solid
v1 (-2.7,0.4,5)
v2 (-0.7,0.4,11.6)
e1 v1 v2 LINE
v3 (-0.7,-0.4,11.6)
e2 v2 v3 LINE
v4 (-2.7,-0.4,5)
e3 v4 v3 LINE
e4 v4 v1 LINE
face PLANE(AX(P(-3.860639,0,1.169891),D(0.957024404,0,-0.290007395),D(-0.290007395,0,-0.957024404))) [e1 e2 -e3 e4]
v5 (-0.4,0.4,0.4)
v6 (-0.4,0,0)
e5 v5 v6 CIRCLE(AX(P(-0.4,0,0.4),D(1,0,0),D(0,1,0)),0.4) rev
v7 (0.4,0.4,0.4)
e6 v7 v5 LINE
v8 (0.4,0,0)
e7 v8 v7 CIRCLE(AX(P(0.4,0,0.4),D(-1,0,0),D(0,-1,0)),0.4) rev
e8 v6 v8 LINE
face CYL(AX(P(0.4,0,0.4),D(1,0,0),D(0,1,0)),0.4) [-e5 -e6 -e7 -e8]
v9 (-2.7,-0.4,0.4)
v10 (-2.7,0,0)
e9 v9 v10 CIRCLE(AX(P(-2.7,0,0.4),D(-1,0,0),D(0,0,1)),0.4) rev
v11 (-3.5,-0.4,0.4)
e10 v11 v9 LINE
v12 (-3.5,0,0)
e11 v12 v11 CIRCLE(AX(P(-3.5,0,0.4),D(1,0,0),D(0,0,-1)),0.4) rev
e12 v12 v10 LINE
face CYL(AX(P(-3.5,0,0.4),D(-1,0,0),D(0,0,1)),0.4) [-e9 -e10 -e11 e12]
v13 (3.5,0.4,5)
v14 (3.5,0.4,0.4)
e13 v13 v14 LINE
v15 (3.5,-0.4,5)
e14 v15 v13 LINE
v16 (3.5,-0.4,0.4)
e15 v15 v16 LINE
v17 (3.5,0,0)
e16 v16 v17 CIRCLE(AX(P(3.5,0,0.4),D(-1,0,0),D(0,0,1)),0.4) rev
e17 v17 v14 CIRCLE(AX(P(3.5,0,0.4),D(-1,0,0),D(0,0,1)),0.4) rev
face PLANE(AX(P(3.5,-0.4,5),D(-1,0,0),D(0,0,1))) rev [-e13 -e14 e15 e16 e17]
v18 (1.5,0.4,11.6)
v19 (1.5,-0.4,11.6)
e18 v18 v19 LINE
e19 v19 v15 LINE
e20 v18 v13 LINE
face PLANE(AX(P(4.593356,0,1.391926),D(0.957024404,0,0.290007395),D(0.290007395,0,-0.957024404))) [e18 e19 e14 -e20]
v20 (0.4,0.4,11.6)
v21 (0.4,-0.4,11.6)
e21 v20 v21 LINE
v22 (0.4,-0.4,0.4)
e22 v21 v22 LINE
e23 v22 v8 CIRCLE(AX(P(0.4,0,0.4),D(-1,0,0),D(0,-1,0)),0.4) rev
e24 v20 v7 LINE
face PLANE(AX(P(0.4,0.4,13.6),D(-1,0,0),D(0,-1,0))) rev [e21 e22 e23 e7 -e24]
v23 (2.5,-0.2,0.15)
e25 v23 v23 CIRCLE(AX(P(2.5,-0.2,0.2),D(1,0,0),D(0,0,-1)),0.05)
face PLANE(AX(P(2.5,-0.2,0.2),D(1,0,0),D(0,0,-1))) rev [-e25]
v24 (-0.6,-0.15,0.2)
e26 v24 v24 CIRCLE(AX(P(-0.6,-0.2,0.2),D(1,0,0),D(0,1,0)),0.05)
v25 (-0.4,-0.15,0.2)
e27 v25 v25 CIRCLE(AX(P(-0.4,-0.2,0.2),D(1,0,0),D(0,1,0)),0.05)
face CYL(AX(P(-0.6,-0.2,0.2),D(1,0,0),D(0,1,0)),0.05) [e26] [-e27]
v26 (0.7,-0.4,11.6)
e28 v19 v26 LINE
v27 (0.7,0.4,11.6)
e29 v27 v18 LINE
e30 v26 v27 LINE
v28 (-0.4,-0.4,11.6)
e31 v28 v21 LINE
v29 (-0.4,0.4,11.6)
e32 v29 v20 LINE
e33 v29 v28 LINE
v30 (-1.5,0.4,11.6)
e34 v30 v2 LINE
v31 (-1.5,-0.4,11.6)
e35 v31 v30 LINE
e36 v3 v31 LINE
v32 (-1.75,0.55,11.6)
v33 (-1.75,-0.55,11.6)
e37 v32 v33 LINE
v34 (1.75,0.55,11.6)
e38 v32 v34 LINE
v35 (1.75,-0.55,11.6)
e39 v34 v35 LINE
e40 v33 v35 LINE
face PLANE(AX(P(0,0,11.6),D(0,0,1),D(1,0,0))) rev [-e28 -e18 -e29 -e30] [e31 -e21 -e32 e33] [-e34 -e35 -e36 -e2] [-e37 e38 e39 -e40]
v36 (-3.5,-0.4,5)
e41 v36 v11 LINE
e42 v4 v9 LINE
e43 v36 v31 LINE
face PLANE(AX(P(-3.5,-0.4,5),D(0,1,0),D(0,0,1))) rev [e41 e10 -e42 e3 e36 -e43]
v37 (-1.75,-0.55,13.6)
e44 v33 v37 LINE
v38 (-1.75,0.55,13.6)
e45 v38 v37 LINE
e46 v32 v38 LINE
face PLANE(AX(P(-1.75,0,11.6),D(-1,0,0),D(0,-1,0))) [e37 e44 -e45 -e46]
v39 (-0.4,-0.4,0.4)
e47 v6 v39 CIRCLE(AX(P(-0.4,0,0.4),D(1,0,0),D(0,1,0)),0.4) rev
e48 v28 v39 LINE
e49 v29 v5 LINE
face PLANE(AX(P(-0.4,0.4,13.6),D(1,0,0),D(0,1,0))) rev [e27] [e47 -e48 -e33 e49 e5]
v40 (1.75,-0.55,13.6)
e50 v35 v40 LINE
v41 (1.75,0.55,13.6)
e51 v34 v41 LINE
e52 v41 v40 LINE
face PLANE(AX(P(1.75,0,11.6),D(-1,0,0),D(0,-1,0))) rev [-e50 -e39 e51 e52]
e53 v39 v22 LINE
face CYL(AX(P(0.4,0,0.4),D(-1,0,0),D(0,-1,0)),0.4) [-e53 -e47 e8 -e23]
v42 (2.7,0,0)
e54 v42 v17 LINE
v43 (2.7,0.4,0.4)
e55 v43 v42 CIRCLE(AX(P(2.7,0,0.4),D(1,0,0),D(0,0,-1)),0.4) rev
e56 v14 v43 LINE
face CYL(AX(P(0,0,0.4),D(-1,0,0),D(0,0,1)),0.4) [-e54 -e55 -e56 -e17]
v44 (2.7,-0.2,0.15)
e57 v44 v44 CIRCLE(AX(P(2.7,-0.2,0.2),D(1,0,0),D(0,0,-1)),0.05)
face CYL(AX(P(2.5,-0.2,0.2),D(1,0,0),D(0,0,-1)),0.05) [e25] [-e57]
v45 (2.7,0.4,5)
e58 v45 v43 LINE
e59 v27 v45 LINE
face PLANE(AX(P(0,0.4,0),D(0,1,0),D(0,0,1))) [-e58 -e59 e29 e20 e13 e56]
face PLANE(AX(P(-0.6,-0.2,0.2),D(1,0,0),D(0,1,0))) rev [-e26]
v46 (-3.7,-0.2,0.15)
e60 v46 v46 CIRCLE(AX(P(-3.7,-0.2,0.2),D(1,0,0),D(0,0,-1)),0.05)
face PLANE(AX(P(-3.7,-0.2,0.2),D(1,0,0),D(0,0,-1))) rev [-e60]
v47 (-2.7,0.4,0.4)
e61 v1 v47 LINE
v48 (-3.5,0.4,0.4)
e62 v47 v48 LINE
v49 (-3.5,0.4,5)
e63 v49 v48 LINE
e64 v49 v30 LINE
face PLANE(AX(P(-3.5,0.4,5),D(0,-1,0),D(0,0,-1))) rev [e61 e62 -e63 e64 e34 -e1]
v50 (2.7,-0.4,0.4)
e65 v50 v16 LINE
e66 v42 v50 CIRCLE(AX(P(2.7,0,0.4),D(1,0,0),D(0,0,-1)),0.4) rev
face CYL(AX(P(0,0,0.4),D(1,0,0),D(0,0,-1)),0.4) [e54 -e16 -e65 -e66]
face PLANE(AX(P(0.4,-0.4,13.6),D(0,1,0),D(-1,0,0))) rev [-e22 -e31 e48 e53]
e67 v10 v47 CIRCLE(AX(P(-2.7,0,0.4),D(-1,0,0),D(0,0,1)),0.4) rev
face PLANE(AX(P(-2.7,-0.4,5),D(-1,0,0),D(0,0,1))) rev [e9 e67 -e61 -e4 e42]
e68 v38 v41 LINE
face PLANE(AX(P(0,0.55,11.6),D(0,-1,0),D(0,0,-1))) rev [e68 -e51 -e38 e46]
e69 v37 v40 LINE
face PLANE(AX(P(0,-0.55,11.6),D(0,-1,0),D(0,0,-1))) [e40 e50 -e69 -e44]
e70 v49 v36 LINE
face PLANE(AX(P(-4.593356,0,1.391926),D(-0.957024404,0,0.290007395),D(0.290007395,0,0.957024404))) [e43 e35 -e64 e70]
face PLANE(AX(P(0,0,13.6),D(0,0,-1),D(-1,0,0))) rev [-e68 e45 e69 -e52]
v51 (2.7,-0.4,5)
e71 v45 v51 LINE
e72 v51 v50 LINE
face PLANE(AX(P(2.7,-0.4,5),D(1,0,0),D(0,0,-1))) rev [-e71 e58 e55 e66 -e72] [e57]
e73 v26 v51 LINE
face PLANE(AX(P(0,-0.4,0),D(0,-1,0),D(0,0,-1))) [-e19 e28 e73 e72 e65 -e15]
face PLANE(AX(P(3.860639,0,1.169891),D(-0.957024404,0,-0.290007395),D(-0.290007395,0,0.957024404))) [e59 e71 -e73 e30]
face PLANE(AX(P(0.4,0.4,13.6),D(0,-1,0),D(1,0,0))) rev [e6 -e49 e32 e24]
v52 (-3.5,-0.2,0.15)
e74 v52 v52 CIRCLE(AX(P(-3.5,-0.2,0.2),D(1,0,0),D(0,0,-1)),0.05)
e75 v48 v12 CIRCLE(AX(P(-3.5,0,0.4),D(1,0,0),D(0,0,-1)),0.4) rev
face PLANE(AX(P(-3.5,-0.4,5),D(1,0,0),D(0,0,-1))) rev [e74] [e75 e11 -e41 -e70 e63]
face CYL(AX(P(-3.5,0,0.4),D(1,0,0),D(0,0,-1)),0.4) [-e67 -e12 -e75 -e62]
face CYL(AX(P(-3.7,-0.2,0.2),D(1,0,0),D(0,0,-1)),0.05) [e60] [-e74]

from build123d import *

# Parameters (mm, degrees)
SKETCH1_W             = 0.8
SKETCH1_H             = 0.8
BOSS_EXTRUDE1_DEPTH   = 13.6
SKETCH2_R             = 0.05
BOSS_EXTRUDE2_DEPTH   = 1
SKETCH3_W             = 3.5
SKETCH3_H             = 1.1
SKETCH3_W_2           = 0.8
SKETCH3_H_2           = 0.8
BOSS_EXTRUDE3_DEPTH   = 2
SKETCH6_W             = 0.8
SKETCH6_H             = 0.8
BOSS_EXTRUDE4_DEPTH   = 5
BOSS_EXTRUDE4_2_DEPTH = 5
SKETCH8_R             = 0.05
BOSS_EXTRUDE5_DEPTH   = 1
SKETCH9_R             = 0.05
BOSS_EXTRUDE6_DEPTH   = 1
LOFT1_START           = -0.4
LOFT1_DEPTH           = 0.8
LOFT2_START           = -0.4
LOFT2_DEPTH           = 0.8
FILLET1_R             = 0.4


# Read off the part's stored shape, not the designer's step: Loft1, Loft2
with BuildPart() as part:
    # Sketch1 → Boss-Extrude1 (new body)
    with BuildSketch(Plane.XY):
        Rectangle(SKETCH1_W, SKETCH1_H)
    extrude(amount=BOSS_EXTRUDE1_DEPTH)

    # Sketch2 → Boss-Extrude2 (add)
    with BuildSketch(Plane(origin=(0.4, 0, 0), x_dir=(0, 0, -1), z_dir=(1, 0, 0))):
        with Locations(Location((-0.2, -0.2, 0), (0, 0, 90))):
            Circle(SKETCH2_R)
    extrude(amount=-BOSS_EXTRUDE2_DEPTH)

    # Sketch3 → Boss-Extrude3 (add)
    # profile 1 of 3: a face of its own
    with BuildSketch(Plane.XY.offset(13.6)):
        Rectangle(SKETCH3_W, SKETCH3_H)
        Rectangle(SKETCH3_W_2, SKETCH3_H_2, mode=Mode.SUBTRACT)
    # profile 2 of 3: a face of its own
    with BuildSketch(Plane.XY.offset(13.6)):
        Rectangle(SKETCH3_W_2, SKETCH3_H_2)
    # profile 3 of 3: a face of its own
    with BuildSketch(Plane.XY.offset(13.6)):
        Rectangle(SKETCH3_W_2, SKETCH3_H_2)
    extrude(amount=-BOSS_EXTRUDE3_DEPTH)



with BuildPart() as body_2:
    # Sketch6 → Boss-Extrude4 (new body)
    with BuildSketch(Plane.XY):
        with Locations((3.1, 0)):
            Rectangle(SKETCH6_W, SKETCH6_H)
    extrude(amount=BOSS_EXTRUDE4_DEPTH)

    # Sketch8 → Boss-Extrude5 (add)
    with BuildSketch(Plane(origin=(3.5, 0, 0), x_dir=(0, 0, -1), z_dir=(1, 0, 0))):
        with Locations(Location((-0.2, -0.2, 0), (0, 0, 90))):
            Circle(SKETCH8_R)
    extrude(amount=-BOSS_EXTRUDE5_DEPTH)


with BuildPart() as body_3:
    # Sketch6 → Boss-Extrude4 2 (new body)
    with BuildSketch(Plane.XY):
        with Locations((-3.1, 0)):
            Rectangle(SKETCH6_W, SKETCH6_H)
    extrude(amount=BOSS_EXTRUDE4_2_DEPTH)

    # Sketch9 → Boss-Extrude6 (add)
    with BuildSketch(Plane(origin=(-2.7, 0, 0), x_dir=(0, 0, -1), z_dir=(1, 0, 0))):
        with Locations((-0.2, -0.2)):
            Circle(SKETCH9_R)
    extrude(amount=-BOSS_EXTRUDE6_DEPTH)


with BuildPart() as part_1:
    add(part.part)

    add(body_2.part)  # Loft1 merges body 2
    # Loft1 outline → Loft1 (add)
    with BuildSketch(Plane(origin=(0, 0, 0), x_dir=(1, 0, 0), z_dir=(0, 1.0, 2.05342141911779e-12)).offset(LOFT1_START)):
        Polygon((0.7, -11.6), (1.5, -11.6), (3.5, -5), (2.7, -5), align=None)
    extrude(amount=LOFT1_DEPTH)


    add(body_3.part)  # Loft2 merges body 3
    # Loft2 outline → Loft2 (add)
    with BuildSketch(Plane(origin=(0, 0, 0), x_dir=(1, 0, 0), z_dir=(0, 1, 0)).offset(LOFT2_START)):
        Polygon((-2.7, -5), (-3.5, -5), (-1.5, -11.6), (-0.7, -11.6), align=None)
    extrude(amount=LOFT2_DEPTH)

    # Fillet1
    fillet1_edges = [part_1.edges().sort_by_distance(p)[0] for p in [
        (-3.1, -0.4, 0),
        (-3.1, 0.4, 0),
        (3.1, -0.4, 0),
        (3.1, 0.4, 0),
        (0, -0.4, 0),
        (0, 0.4, 0),
    ]]
    fillet(fillet1_edges, radius=FILLET1_R - 0.0001)  # a hair under: the kernel refuses the full size


solid = part_1.part
